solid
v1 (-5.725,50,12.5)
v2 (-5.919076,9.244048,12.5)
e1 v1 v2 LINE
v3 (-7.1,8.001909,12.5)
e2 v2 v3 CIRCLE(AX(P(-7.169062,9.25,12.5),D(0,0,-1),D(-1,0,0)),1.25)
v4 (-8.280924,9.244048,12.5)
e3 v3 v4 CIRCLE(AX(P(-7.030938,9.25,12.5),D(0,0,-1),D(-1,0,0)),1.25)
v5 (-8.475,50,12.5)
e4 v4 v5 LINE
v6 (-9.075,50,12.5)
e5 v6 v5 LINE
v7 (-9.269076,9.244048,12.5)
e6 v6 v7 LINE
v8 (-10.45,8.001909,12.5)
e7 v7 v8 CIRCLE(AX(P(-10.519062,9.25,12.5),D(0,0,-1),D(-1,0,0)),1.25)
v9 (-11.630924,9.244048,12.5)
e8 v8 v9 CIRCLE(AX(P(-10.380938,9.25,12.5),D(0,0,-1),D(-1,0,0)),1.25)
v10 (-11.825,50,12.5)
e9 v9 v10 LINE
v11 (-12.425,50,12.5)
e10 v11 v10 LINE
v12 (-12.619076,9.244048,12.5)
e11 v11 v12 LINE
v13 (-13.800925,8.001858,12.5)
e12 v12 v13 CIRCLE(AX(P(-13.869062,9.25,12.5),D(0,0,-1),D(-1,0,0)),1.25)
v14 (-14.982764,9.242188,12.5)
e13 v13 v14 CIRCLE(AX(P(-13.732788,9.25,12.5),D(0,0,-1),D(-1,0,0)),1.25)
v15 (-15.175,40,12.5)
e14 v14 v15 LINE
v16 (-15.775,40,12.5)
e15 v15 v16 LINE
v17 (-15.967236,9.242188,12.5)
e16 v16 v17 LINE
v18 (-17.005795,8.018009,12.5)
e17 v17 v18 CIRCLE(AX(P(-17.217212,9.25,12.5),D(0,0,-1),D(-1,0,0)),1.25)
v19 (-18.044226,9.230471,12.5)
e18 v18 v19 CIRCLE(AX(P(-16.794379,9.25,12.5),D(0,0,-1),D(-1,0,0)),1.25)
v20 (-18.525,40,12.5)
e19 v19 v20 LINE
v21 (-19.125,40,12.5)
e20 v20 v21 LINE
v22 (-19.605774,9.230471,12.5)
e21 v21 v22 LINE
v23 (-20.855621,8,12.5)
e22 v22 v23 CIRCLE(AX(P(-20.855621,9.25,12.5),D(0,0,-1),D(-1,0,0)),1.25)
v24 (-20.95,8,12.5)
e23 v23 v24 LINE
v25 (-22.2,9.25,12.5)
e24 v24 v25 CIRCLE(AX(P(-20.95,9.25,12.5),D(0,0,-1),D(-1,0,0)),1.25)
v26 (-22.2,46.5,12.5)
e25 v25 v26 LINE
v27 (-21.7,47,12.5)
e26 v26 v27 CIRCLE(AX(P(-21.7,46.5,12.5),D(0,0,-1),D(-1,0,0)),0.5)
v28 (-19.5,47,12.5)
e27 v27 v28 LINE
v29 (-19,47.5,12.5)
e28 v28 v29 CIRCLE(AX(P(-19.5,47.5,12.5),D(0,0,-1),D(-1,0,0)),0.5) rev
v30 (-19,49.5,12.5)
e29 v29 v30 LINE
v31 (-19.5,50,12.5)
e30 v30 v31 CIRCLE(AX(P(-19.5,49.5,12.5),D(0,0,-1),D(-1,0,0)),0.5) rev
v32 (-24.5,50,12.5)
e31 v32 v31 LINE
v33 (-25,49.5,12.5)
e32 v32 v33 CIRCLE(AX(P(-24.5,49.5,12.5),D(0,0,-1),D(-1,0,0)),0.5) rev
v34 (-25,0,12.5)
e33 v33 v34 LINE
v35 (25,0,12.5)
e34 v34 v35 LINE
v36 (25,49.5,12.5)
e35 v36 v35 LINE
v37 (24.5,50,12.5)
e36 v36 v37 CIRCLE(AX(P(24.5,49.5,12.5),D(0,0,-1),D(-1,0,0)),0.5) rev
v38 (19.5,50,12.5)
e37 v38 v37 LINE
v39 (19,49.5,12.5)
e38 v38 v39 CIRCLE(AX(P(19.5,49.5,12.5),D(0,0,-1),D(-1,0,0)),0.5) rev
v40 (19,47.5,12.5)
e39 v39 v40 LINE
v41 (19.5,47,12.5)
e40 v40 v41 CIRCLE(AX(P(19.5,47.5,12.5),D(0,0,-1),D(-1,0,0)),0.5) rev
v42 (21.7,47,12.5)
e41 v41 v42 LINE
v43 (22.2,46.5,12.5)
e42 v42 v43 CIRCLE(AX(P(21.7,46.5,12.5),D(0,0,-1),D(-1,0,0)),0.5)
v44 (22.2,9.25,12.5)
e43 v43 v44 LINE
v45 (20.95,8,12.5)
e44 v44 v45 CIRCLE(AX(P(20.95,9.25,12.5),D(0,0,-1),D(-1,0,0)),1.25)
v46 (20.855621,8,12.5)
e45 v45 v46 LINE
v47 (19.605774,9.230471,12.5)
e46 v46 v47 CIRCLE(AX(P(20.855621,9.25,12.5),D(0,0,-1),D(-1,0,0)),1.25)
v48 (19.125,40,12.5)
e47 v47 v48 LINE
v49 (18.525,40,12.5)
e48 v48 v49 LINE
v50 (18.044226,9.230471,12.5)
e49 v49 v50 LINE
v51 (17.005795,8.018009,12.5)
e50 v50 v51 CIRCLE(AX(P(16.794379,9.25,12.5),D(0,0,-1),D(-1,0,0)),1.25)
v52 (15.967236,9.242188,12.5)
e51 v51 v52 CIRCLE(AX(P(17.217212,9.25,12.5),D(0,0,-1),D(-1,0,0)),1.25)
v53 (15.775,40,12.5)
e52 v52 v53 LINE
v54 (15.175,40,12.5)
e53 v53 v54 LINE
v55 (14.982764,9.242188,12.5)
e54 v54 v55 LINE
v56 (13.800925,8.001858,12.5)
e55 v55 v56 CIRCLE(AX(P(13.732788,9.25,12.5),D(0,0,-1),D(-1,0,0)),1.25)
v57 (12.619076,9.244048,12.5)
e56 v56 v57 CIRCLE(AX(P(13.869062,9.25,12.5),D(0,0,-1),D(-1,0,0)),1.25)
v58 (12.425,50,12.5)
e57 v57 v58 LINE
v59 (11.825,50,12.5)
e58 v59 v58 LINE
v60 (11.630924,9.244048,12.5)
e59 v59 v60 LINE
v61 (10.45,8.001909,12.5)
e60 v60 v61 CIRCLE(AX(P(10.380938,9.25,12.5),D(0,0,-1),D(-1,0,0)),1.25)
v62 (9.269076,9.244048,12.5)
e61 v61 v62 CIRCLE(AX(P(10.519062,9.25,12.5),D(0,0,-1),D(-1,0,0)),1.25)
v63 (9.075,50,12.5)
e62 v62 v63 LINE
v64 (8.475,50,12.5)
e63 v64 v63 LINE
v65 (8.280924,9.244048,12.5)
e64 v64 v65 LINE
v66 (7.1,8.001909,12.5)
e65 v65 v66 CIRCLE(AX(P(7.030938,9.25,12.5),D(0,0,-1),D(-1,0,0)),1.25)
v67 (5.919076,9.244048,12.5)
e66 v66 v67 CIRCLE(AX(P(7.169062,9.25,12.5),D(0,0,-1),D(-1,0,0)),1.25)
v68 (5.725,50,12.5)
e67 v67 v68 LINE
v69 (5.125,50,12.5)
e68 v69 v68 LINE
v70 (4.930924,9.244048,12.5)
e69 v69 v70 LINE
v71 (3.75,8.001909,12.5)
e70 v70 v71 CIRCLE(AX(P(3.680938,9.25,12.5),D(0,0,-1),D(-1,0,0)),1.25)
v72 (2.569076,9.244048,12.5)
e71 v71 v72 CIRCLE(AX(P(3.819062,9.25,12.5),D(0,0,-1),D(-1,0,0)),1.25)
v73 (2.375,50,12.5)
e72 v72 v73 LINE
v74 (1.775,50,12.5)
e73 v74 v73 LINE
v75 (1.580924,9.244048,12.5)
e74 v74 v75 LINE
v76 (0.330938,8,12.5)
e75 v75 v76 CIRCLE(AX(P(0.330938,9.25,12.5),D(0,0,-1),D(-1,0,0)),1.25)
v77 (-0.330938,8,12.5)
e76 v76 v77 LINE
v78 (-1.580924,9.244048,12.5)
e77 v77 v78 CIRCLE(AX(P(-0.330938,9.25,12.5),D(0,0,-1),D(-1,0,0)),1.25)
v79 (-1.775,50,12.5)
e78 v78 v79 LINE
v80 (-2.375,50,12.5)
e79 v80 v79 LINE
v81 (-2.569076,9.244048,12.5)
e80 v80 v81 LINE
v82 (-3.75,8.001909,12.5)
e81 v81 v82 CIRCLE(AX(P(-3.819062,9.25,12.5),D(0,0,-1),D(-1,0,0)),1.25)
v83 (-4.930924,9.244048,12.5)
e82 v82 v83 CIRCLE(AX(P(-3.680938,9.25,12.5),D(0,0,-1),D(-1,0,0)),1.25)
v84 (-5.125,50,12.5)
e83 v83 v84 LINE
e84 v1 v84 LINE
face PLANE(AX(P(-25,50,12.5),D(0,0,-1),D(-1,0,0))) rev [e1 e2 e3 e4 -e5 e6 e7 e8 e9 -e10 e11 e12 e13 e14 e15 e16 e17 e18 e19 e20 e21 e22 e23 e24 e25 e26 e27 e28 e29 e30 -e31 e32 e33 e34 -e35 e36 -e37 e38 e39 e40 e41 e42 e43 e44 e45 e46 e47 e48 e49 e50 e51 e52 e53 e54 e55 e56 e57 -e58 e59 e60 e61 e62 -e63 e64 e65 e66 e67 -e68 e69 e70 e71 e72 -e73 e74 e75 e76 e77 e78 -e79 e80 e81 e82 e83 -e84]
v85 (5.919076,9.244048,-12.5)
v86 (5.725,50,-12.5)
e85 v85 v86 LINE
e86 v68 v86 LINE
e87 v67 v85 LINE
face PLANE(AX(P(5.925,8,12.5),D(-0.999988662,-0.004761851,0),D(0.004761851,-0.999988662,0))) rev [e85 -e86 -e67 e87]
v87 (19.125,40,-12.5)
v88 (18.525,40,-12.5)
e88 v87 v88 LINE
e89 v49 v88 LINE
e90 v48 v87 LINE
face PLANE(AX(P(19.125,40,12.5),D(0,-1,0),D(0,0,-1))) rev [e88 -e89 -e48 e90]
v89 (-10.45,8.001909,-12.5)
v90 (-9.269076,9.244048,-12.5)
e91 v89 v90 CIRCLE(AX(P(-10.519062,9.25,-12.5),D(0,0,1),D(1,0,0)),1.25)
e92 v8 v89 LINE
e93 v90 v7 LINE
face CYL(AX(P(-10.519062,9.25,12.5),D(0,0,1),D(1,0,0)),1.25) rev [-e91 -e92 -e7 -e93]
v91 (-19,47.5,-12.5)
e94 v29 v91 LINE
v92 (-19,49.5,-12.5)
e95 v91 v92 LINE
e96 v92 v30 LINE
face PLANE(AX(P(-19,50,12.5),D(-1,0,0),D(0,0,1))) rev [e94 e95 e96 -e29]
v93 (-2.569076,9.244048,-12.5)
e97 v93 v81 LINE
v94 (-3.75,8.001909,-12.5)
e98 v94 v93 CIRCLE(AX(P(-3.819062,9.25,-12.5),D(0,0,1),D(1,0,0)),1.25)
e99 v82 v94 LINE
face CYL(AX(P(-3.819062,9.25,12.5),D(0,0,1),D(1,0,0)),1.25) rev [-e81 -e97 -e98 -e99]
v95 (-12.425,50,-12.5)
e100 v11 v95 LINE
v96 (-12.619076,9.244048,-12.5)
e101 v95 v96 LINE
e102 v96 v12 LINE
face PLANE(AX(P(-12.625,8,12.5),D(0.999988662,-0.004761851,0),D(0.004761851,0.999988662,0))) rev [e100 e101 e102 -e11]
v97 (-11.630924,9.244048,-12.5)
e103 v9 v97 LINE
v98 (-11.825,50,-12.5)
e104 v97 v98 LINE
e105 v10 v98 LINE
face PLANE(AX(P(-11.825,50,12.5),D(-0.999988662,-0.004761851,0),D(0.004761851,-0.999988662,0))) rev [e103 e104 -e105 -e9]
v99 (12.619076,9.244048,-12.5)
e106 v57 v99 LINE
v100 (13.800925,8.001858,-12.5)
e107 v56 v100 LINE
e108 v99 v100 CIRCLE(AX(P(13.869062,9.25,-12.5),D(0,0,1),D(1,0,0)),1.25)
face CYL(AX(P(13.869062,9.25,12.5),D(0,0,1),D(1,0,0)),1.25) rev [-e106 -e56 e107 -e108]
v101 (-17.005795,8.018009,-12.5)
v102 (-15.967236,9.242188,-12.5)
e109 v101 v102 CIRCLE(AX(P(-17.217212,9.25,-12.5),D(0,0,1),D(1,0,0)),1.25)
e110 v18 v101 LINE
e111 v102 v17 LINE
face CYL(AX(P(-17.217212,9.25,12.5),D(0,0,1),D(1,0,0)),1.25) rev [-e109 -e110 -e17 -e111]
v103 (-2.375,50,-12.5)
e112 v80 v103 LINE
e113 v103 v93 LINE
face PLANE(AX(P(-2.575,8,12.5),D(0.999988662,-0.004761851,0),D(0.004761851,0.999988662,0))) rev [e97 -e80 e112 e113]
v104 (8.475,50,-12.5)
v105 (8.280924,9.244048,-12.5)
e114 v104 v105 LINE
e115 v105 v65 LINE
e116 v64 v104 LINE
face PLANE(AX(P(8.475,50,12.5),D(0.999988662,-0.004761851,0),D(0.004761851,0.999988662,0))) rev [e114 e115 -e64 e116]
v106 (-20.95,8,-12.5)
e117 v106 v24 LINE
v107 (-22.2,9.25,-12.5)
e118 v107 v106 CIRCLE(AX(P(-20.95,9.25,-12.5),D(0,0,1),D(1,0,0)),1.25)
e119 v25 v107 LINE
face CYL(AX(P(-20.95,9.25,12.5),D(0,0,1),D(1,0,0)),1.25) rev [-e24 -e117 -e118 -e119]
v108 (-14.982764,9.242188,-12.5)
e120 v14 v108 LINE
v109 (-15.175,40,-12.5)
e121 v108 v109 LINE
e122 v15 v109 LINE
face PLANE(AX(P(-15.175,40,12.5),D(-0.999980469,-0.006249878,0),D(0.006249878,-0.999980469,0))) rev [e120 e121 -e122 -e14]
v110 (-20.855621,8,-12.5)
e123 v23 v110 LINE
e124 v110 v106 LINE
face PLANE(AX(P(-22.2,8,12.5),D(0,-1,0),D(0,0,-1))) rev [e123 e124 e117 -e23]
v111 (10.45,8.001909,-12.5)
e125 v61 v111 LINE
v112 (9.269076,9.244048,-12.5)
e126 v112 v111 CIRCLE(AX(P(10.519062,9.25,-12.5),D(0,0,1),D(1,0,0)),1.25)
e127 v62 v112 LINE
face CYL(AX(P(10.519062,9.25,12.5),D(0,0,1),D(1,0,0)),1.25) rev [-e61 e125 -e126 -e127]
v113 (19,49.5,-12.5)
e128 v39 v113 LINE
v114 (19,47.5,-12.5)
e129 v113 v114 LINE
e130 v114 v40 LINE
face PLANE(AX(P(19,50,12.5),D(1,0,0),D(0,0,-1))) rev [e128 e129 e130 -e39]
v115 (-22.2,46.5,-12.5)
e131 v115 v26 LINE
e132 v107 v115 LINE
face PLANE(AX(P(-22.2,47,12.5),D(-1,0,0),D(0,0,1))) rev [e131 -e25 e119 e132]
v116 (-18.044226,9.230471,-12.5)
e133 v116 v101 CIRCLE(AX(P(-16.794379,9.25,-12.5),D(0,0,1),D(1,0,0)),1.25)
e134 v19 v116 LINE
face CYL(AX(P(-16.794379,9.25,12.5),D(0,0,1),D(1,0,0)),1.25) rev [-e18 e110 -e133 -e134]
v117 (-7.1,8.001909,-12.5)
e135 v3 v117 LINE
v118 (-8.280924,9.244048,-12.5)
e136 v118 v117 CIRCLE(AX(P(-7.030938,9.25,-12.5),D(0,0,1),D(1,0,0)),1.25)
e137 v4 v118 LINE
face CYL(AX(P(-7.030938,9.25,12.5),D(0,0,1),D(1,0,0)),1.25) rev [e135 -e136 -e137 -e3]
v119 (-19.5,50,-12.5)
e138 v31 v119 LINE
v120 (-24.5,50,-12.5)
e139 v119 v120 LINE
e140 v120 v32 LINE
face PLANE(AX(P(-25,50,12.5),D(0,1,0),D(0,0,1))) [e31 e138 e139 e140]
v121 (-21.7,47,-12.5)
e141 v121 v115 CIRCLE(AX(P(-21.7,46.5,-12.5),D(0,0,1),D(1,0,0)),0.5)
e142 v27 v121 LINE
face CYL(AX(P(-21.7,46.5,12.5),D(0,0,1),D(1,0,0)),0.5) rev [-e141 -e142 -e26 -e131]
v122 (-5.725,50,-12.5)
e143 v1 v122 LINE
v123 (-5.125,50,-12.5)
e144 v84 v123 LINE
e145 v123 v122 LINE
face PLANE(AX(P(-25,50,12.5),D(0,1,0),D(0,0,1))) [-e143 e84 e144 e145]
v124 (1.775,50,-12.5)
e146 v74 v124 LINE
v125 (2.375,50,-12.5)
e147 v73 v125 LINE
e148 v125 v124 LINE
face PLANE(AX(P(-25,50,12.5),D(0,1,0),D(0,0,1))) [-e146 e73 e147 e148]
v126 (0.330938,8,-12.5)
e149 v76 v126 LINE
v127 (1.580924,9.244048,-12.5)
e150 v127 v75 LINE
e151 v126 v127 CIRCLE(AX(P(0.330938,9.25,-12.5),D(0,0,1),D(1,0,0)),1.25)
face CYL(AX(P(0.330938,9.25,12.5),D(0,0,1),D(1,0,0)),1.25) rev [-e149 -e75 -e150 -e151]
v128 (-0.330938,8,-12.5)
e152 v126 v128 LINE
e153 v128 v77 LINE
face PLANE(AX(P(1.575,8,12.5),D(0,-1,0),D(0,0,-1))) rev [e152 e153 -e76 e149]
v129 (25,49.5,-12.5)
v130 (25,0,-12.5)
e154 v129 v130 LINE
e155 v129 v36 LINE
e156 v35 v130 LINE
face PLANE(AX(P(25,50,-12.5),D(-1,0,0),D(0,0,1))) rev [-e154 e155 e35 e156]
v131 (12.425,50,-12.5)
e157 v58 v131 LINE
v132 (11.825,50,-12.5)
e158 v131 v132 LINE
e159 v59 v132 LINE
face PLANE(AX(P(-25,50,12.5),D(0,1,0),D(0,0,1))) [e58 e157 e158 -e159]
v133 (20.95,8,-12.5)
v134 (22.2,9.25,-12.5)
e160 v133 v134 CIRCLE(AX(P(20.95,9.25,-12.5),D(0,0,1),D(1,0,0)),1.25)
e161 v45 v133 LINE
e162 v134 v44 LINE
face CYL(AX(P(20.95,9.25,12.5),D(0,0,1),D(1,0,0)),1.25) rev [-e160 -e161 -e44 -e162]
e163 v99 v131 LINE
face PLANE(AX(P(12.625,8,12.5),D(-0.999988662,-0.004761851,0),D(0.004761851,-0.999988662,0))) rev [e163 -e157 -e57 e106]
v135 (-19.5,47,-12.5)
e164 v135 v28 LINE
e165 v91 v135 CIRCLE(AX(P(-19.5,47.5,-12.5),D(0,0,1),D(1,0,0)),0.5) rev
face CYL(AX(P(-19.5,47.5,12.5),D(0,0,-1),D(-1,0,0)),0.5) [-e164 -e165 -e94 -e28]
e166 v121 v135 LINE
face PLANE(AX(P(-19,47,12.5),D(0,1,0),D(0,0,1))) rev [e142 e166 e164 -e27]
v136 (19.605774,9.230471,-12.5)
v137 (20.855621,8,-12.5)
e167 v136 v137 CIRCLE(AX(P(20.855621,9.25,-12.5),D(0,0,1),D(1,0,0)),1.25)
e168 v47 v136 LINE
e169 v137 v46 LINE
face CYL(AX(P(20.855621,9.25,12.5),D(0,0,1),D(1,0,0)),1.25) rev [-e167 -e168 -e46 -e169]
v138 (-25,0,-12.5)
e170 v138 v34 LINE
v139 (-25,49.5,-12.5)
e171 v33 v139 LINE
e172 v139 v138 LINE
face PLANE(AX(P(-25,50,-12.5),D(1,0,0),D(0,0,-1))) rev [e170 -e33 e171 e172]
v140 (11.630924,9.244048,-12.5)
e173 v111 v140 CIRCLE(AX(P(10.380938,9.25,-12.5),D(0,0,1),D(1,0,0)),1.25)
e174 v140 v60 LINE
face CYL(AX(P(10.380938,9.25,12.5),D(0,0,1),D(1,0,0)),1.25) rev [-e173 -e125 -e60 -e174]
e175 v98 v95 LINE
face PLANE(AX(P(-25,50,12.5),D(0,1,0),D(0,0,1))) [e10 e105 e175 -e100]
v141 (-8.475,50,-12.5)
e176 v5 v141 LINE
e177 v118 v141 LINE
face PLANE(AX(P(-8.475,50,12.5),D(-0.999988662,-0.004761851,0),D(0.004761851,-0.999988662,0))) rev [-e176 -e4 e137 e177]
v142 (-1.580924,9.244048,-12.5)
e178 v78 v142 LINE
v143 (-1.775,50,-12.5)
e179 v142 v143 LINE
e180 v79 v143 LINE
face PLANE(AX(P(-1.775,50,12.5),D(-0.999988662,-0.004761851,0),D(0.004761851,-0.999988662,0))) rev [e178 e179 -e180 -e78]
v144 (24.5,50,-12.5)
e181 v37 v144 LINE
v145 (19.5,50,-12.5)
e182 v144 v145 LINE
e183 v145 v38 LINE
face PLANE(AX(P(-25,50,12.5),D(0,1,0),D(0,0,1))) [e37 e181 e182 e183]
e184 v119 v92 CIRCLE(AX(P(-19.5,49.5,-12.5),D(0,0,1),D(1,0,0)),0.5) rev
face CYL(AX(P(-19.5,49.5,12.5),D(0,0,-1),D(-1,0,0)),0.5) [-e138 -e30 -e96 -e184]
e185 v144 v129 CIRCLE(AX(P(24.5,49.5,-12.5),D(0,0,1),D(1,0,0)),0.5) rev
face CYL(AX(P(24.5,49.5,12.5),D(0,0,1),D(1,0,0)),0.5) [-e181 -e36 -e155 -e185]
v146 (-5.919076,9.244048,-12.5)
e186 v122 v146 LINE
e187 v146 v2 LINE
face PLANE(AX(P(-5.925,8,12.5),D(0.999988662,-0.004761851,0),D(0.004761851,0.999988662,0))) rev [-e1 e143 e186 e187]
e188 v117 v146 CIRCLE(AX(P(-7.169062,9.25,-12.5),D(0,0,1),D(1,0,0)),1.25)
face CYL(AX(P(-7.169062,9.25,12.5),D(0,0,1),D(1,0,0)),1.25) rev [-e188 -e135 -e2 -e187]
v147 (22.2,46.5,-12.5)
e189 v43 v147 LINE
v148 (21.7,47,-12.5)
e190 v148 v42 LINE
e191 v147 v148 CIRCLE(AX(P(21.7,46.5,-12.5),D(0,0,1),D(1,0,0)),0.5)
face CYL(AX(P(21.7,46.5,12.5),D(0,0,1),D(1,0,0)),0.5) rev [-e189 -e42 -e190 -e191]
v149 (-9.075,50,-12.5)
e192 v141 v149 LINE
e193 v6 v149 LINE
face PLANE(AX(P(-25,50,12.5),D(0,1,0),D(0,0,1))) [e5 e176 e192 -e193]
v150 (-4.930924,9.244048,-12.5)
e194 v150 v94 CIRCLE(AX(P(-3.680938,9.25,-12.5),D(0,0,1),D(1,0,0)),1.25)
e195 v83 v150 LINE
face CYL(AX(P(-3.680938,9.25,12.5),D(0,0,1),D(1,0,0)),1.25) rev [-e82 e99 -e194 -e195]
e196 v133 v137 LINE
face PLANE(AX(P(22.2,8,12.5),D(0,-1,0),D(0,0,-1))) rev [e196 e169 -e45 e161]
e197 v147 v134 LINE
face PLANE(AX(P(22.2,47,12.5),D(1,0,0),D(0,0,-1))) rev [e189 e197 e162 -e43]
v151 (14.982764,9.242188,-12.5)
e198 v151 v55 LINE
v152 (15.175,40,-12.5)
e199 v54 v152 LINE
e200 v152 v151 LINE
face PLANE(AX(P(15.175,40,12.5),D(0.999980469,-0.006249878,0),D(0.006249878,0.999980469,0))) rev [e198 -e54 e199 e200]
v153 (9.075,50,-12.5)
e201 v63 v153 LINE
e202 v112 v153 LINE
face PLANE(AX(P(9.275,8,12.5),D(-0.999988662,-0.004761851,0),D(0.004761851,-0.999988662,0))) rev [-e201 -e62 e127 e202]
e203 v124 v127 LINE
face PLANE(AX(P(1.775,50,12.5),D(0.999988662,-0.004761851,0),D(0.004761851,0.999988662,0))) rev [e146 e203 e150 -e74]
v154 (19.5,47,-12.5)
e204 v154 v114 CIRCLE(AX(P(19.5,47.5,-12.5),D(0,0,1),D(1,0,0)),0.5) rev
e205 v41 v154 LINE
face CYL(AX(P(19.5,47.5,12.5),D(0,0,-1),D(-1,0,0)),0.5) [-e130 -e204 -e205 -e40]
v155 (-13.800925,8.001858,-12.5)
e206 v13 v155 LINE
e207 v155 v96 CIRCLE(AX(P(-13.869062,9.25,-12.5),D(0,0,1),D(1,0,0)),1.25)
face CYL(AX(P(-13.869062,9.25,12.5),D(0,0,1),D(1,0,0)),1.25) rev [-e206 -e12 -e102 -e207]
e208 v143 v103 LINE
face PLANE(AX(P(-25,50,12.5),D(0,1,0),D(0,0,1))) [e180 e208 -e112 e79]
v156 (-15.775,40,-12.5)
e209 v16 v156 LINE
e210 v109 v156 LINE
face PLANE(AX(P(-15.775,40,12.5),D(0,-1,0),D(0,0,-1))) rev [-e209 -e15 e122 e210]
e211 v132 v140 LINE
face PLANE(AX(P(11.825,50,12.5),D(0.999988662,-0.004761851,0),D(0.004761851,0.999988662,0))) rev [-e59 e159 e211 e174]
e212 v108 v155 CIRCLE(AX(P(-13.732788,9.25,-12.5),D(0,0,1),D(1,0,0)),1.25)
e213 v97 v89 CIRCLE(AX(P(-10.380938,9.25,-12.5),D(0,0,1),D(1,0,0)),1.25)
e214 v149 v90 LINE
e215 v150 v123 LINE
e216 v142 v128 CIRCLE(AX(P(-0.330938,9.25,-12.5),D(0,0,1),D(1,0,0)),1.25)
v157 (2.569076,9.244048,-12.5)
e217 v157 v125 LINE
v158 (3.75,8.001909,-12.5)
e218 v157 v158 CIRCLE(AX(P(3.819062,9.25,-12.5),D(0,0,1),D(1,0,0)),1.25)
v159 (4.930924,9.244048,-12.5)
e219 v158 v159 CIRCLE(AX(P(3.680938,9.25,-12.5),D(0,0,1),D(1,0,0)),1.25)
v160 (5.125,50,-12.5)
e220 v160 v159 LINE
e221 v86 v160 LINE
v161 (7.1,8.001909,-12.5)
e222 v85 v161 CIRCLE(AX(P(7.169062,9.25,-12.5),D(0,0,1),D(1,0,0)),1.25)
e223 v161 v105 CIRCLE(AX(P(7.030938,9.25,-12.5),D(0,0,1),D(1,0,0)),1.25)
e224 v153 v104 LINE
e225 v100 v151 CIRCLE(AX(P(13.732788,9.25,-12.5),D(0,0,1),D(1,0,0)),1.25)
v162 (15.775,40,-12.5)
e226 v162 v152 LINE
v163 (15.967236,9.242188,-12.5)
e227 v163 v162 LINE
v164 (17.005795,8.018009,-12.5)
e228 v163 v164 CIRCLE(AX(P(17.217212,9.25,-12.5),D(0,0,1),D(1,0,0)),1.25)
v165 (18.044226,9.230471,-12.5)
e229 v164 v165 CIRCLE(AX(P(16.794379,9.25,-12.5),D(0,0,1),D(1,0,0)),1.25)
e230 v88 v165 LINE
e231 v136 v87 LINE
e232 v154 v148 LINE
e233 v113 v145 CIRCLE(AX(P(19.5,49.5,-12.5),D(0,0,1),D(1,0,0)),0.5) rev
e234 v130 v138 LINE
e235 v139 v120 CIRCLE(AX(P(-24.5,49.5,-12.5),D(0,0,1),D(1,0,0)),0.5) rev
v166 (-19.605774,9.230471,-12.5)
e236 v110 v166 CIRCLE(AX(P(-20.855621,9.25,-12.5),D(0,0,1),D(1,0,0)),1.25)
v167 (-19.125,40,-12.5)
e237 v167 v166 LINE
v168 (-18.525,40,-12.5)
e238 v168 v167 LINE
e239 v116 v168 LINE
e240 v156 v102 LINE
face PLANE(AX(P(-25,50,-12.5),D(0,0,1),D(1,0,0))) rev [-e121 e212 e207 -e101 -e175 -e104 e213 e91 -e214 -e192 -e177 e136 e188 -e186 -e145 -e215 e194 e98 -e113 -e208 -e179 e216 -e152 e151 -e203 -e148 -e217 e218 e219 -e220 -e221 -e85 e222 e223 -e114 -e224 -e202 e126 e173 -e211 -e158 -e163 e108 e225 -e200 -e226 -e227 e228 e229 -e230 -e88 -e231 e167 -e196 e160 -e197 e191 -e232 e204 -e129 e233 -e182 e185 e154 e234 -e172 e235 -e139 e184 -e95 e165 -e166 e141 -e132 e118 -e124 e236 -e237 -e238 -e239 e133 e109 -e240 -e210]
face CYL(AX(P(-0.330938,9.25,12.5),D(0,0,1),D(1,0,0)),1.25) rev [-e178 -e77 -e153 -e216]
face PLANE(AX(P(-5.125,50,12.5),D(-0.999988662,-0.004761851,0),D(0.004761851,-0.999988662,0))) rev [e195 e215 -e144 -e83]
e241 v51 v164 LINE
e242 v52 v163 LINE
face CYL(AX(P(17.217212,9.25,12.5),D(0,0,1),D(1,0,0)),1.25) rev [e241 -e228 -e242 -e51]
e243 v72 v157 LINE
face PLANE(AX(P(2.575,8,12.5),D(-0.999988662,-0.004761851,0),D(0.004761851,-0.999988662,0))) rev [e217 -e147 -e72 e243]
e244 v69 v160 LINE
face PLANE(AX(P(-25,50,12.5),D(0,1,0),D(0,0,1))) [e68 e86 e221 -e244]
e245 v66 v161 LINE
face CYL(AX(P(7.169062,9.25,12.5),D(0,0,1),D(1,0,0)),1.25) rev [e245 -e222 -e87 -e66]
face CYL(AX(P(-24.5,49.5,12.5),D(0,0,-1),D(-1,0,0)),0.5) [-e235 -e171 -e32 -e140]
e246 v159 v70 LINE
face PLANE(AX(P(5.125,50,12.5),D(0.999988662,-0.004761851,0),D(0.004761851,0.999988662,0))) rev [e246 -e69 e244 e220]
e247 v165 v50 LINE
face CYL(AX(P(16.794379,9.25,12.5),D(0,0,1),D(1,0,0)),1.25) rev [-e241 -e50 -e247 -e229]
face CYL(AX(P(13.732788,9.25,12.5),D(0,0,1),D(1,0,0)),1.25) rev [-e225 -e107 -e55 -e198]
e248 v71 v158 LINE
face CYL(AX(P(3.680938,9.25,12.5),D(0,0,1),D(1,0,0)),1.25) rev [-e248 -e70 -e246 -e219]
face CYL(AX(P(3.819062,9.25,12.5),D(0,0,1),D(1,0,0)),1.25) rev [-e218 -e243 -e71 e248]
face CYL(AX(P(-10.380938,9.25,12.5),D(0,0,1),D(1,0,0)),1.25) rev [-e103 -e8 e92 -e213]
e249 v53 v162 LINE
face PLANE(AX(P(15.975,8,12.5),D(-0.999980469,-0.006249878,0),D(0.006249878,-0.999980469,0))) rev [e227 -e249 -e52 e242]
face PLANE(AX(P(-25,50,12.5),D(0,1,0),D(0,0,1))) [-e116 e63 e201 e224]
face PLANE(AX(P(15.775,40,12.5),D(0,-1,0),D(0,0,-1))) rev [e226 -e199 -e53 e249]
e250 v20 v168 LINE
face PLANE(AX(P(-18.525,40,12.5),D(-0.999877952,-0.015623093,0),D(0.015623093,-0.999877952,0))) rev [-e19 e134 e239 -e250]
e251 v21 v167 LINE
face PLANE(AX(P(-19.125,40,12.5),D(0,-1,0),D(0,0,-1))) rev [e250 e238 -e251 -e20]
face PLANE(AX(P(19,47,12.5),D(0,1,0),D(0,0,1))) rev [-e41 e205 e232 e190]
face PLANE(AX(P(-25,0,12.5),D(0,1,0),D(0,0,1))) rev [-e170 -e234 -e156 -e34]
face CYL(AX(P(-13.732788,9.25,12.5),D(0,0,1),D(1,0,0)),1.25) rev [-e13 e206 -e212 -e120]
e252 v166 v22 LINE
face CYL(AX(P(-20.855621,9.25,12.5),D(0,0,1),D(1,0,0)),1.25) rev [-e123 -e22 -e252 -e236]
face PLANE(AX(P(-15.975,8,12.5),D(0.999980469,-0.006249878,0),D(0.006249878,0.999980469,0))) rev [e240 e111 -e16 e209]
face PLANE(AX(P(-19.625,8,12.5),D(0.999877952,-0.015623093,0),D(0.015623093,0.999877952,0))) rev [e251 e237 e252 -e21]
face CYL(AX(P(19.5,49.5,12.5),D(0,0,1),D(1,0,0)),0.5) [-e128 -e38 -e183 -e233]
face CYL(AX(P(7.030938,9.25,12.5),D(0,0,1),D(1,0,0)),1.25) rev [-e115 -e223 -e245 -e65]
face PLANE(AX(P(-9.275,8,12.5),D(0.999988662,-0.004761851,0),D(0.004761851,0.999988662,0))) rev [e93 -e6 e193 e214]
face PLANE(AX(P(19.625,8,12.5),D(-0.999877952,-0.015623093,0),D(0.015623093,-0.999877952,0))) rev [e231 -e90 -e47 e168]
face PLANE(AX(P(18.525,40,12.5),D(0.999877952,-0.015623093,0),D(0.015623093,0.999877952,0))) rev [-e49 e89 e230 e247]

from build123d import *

# Parameters (mm, degrees)
SKETCH_1_W          = 50
SKETCH_1_H          = 25
EXTRUDE_1_DEPTH     = 50
CUT_EXTRUDE_3_DEPTH = 62.23724357
FILLET_1_R          = 1.25
FILLET_2_R          = 0.5


with BuildPart() as part:
    # 草图1 → 拉伸1 (new body)
    with BuildSketch(Plane(origin=(0, 0, 0), x_dir=(1, 0, 0), z_dir=(0, 1, 0))):
        Rectangle(SKETCH_1_W, SKETCH_1_H)
    extrude(amount=EXTRUDE_1_DEPTH)

    # 草图3 → 切除-拉伸3 (cut, through all)
    with BuildSketch(Plane(origin=(0, 0, -12.5), x_dir=(-1, 0, 0), z_dir=(0, 0, -1))):
        Polygon((-19, 50), (-19, 47), (-22.2, 47), (-22.2, 8), (-19.625, 8), (-19.125, 40), (-18.525, 40), (-18.025, 8), (-15.975, 8), (-15.775, 40), (-15.175, 40), (-14.975, 8), (-12.625, 8), (-12.425, 50), (-11.825, 50), (-11.625, 8), (-9.275, 8), (-9.075, 50), (-8.475, 50), (-8.275, 8), (-5.925, 8), (-5.725, 50), (-5.125, 50), (-4.925, 8), (-2.575, 8), (-2.375, 50), (-1.775, 50), (-1.575, 8), (1.575, 8), (1.775, 50), (2.375, 50), (2.575, 8), (4.925, 8), (5.125, 50), (5.725, 50), (5.925, 8), (8.275, 8), (8.475, 50), (9.075, 50), (9.275, 8), (11.625, 8), (11.825, 50), (12.425, 50), (12.625, 8), (14.975, 8), (15.175, 40), (15.775, 40), (15.975, 8), (18.025, 8), (18.525, 40), (19.125, 40), (19.625, 8), (22.2, 8), (22.2, 47), (19, 47), (19, 50), (19, 55.346255007), (-19, 55.346255007), align=None)
    extrude(amount=-CUT_EXTRUDE_3_DEPTH, mode=Mode.SUBTRACT)

    # 圆角1
    # the kernel refuses this fillet: 1.25 mm, written as the material it adds along each edge
    with BuildSketch(Plane(origin=(-2.575, 8, -12.5), x_dir=(0.004761850772972935, 0.9999886623243365, 0), z_dir=(0, 0, 1)), Plane(origin=(-1.575, 8, -12.5), x_dir=(1, 0, 0), z_dir=(0, 0, 1)), Plane(origin=(1.575, 8, -12.5), x_dir=(0.004761850772973114, 0.9999886623243365, 0), z_dir=(0, 0, 1)), Plane(origin=(2.575, 8, -12.5), x_dir=(1, 0, 0), z_dir=(0, 0, 1)), Plane(origin=(4.925, 8, -12.5), x_dir=(0.004761850772972935, 0.9999886623243365, 0), z_dir=(0, 0, 1)), Plane(origin=(5.925, 8, -12.5), x_dir=(1, 0, 0), z_dir=(0, 0, 1)), Plane(origin=(8.275, 8, -12.5), x_dir=(0.004761850772972963, 0.9999886623243365, 0), z_dir=(0, 0, 1)), Plane(origin=(9.275, 8, -12.5), x_dir=(1, 0, 0), z_dir=(0, 0, 1)), Plane(origin=(11.625, 8, -12.5), x_dir=(0.004761850772972963, 0.9999886623243365, 0), z_dir=(0, 0, 1)), Plane(origin=(12.625, 8, -12.5), x_dir=(1, 0, 0), z_dir=(0, 0, 1)), Plane(origin=(-12.625, 8, -12.5), x_dir=(0.004761850772972963, 0.9999886623243365, 0), z_dir=(0, 0, 1)), Plane(origin=(-11.625, 8, -12.5), x_dir=(1, 0, 0), z_dir=(0, 0, 1)), Plane(origin=(-9.275, 8, -12.5), x_dir=(0.004761850772972963, 0.9999886623243365, 0), z_dir=(0, 0, 1)), Plane(origin=(-8.275, 8, -12.5), x_dir=(1, 0, 0), z_dir=(0, 0, 1)), Plane(origin=(-5.925, 8, -12.5), x_dir=(0.004761850772972935, 0.9999886623243365, 0), z_dir=(0, 0, 1)), Plane(origin=(-4.925, 8, -12.5), x_dir=(1, 0, 0), z_dir=(0, 0, 1))) as fillet_1_piece_1:
        with BuildLine():
            CenterArc((FILLET_1_R * 0.995249433042, FILLET_1_R), FILLET_1_R, 180.272834983, 89.727165017)
            Line((-FILLET_1_R * 0.00473922928203, FILLET_1_R * 0.995238149227), (0, 0))
            Line((0, 0), (FILLET_1_R * 0.995249433042, 0))
        make_face()
    extrude(amount=25)
    with BuildSketch(Plane(origin=(14.975, 8, -12.5), x_dir=(0.006249877933264038, 0.999980469322186, 0), z_dir=(0, 0, 1)), Plane(origin=(15.975, 8, -12.5), x_dir=(1, 0, 0), z_dir=(0, 0, 1)), Plane(origin=(-15.975, 8, -12.5), x_dir=(0.00624987793326402, 0.999980469322186, 0), z_dir=(0, 0, 1)), Plane(origin=(-14.975, 8, -12.5), x_dir=(1, 0, 0), z_dir=(0, 0, 1))) as fillet_1_piece_2:
        with BuildLine():
            CenterArc((FILLET_1_R * 0.993769531059, FILLET_1_R), FILLET_1_R, 180.358093959, 89.641906041)
            Line((-FILLET_1_R * 0.00621093826293, FILLET_1_R * 0.993750122067), (0, 0))
            Line((0, 0), (FILLET_1_R * 0.993769531059, 0))
        make_face()
    extrude(amount=25)
    with BuildSketch(Plane(origin=(18.025, 8, -12.5), x_dir=(0.015623093000541032, 0.9998779520346953, 0), z_dir=(0, 0, 1)), Plane(origin=(19.625, 8, -12.5), x_dir=(1, 0, 0), z_dir=(0, 0, 1)), Plane(origin=(-19.625, 8, -12.5), x_dir=(0.015623093000541032, 0.9998779520346953, 0), z_dir=(0, 0, 1)), Plane(origin=(-18.025, 8, -12.5), x_dir=(1, 0, 0), z_dir=(0, 0, 1))) as fillet_1_piece_3:
        with BuildLine():
            CenterArc((FILLET_1_R * 0.984497062863, FILLET_1_R), FILLET_1_R, 180.89517371, 89.10482629)
            Line((-FILLET_1_R * 0.0153808891719, FILLET_1_R * 0.984376906999), (0, 0))
            Line((0, 0), (FILLET_1_R * 0.984497062863, 0))
        make_face()
    extrude(amount=25)
    with BuildSketch(Plane(origin=(22.2, 8, -12.5), x_dir=(0, 1, 0), z_dir=(0, 0, 1)), Plane(origin=(-22.2, 8, -12.5), x_dir=(1, 0, 0), z_dir=(0, 0, 1))) as fillet_1_piece_4:
        with BuildLine():
            CenterArc((FILLET_1_R, FILLET_1_R), FILLET_1_R, 180, 90)
            Line((0, FILLET_1_R), (0, 0))
            Line((0, 0), (FILLET_1_R, 0))
        make_face()
    extrude(amount=25)

    # 圆角2
    fillet_2_edges = [part.edges().sort_by_distance(p)[0] for p in [
        (25, 50, 0),
        (22.2, 47, 0),
        (19, 47, 0),
        (19, 50, 0),
        (-19, 50, 0),
        (-25, 50, 0),
        (-19, 47, 0),
        (-22.2, 47, 0),
    ]]
    fillet(fillet_2_edges, radius=FILLET_2_R)


solid = part.part
